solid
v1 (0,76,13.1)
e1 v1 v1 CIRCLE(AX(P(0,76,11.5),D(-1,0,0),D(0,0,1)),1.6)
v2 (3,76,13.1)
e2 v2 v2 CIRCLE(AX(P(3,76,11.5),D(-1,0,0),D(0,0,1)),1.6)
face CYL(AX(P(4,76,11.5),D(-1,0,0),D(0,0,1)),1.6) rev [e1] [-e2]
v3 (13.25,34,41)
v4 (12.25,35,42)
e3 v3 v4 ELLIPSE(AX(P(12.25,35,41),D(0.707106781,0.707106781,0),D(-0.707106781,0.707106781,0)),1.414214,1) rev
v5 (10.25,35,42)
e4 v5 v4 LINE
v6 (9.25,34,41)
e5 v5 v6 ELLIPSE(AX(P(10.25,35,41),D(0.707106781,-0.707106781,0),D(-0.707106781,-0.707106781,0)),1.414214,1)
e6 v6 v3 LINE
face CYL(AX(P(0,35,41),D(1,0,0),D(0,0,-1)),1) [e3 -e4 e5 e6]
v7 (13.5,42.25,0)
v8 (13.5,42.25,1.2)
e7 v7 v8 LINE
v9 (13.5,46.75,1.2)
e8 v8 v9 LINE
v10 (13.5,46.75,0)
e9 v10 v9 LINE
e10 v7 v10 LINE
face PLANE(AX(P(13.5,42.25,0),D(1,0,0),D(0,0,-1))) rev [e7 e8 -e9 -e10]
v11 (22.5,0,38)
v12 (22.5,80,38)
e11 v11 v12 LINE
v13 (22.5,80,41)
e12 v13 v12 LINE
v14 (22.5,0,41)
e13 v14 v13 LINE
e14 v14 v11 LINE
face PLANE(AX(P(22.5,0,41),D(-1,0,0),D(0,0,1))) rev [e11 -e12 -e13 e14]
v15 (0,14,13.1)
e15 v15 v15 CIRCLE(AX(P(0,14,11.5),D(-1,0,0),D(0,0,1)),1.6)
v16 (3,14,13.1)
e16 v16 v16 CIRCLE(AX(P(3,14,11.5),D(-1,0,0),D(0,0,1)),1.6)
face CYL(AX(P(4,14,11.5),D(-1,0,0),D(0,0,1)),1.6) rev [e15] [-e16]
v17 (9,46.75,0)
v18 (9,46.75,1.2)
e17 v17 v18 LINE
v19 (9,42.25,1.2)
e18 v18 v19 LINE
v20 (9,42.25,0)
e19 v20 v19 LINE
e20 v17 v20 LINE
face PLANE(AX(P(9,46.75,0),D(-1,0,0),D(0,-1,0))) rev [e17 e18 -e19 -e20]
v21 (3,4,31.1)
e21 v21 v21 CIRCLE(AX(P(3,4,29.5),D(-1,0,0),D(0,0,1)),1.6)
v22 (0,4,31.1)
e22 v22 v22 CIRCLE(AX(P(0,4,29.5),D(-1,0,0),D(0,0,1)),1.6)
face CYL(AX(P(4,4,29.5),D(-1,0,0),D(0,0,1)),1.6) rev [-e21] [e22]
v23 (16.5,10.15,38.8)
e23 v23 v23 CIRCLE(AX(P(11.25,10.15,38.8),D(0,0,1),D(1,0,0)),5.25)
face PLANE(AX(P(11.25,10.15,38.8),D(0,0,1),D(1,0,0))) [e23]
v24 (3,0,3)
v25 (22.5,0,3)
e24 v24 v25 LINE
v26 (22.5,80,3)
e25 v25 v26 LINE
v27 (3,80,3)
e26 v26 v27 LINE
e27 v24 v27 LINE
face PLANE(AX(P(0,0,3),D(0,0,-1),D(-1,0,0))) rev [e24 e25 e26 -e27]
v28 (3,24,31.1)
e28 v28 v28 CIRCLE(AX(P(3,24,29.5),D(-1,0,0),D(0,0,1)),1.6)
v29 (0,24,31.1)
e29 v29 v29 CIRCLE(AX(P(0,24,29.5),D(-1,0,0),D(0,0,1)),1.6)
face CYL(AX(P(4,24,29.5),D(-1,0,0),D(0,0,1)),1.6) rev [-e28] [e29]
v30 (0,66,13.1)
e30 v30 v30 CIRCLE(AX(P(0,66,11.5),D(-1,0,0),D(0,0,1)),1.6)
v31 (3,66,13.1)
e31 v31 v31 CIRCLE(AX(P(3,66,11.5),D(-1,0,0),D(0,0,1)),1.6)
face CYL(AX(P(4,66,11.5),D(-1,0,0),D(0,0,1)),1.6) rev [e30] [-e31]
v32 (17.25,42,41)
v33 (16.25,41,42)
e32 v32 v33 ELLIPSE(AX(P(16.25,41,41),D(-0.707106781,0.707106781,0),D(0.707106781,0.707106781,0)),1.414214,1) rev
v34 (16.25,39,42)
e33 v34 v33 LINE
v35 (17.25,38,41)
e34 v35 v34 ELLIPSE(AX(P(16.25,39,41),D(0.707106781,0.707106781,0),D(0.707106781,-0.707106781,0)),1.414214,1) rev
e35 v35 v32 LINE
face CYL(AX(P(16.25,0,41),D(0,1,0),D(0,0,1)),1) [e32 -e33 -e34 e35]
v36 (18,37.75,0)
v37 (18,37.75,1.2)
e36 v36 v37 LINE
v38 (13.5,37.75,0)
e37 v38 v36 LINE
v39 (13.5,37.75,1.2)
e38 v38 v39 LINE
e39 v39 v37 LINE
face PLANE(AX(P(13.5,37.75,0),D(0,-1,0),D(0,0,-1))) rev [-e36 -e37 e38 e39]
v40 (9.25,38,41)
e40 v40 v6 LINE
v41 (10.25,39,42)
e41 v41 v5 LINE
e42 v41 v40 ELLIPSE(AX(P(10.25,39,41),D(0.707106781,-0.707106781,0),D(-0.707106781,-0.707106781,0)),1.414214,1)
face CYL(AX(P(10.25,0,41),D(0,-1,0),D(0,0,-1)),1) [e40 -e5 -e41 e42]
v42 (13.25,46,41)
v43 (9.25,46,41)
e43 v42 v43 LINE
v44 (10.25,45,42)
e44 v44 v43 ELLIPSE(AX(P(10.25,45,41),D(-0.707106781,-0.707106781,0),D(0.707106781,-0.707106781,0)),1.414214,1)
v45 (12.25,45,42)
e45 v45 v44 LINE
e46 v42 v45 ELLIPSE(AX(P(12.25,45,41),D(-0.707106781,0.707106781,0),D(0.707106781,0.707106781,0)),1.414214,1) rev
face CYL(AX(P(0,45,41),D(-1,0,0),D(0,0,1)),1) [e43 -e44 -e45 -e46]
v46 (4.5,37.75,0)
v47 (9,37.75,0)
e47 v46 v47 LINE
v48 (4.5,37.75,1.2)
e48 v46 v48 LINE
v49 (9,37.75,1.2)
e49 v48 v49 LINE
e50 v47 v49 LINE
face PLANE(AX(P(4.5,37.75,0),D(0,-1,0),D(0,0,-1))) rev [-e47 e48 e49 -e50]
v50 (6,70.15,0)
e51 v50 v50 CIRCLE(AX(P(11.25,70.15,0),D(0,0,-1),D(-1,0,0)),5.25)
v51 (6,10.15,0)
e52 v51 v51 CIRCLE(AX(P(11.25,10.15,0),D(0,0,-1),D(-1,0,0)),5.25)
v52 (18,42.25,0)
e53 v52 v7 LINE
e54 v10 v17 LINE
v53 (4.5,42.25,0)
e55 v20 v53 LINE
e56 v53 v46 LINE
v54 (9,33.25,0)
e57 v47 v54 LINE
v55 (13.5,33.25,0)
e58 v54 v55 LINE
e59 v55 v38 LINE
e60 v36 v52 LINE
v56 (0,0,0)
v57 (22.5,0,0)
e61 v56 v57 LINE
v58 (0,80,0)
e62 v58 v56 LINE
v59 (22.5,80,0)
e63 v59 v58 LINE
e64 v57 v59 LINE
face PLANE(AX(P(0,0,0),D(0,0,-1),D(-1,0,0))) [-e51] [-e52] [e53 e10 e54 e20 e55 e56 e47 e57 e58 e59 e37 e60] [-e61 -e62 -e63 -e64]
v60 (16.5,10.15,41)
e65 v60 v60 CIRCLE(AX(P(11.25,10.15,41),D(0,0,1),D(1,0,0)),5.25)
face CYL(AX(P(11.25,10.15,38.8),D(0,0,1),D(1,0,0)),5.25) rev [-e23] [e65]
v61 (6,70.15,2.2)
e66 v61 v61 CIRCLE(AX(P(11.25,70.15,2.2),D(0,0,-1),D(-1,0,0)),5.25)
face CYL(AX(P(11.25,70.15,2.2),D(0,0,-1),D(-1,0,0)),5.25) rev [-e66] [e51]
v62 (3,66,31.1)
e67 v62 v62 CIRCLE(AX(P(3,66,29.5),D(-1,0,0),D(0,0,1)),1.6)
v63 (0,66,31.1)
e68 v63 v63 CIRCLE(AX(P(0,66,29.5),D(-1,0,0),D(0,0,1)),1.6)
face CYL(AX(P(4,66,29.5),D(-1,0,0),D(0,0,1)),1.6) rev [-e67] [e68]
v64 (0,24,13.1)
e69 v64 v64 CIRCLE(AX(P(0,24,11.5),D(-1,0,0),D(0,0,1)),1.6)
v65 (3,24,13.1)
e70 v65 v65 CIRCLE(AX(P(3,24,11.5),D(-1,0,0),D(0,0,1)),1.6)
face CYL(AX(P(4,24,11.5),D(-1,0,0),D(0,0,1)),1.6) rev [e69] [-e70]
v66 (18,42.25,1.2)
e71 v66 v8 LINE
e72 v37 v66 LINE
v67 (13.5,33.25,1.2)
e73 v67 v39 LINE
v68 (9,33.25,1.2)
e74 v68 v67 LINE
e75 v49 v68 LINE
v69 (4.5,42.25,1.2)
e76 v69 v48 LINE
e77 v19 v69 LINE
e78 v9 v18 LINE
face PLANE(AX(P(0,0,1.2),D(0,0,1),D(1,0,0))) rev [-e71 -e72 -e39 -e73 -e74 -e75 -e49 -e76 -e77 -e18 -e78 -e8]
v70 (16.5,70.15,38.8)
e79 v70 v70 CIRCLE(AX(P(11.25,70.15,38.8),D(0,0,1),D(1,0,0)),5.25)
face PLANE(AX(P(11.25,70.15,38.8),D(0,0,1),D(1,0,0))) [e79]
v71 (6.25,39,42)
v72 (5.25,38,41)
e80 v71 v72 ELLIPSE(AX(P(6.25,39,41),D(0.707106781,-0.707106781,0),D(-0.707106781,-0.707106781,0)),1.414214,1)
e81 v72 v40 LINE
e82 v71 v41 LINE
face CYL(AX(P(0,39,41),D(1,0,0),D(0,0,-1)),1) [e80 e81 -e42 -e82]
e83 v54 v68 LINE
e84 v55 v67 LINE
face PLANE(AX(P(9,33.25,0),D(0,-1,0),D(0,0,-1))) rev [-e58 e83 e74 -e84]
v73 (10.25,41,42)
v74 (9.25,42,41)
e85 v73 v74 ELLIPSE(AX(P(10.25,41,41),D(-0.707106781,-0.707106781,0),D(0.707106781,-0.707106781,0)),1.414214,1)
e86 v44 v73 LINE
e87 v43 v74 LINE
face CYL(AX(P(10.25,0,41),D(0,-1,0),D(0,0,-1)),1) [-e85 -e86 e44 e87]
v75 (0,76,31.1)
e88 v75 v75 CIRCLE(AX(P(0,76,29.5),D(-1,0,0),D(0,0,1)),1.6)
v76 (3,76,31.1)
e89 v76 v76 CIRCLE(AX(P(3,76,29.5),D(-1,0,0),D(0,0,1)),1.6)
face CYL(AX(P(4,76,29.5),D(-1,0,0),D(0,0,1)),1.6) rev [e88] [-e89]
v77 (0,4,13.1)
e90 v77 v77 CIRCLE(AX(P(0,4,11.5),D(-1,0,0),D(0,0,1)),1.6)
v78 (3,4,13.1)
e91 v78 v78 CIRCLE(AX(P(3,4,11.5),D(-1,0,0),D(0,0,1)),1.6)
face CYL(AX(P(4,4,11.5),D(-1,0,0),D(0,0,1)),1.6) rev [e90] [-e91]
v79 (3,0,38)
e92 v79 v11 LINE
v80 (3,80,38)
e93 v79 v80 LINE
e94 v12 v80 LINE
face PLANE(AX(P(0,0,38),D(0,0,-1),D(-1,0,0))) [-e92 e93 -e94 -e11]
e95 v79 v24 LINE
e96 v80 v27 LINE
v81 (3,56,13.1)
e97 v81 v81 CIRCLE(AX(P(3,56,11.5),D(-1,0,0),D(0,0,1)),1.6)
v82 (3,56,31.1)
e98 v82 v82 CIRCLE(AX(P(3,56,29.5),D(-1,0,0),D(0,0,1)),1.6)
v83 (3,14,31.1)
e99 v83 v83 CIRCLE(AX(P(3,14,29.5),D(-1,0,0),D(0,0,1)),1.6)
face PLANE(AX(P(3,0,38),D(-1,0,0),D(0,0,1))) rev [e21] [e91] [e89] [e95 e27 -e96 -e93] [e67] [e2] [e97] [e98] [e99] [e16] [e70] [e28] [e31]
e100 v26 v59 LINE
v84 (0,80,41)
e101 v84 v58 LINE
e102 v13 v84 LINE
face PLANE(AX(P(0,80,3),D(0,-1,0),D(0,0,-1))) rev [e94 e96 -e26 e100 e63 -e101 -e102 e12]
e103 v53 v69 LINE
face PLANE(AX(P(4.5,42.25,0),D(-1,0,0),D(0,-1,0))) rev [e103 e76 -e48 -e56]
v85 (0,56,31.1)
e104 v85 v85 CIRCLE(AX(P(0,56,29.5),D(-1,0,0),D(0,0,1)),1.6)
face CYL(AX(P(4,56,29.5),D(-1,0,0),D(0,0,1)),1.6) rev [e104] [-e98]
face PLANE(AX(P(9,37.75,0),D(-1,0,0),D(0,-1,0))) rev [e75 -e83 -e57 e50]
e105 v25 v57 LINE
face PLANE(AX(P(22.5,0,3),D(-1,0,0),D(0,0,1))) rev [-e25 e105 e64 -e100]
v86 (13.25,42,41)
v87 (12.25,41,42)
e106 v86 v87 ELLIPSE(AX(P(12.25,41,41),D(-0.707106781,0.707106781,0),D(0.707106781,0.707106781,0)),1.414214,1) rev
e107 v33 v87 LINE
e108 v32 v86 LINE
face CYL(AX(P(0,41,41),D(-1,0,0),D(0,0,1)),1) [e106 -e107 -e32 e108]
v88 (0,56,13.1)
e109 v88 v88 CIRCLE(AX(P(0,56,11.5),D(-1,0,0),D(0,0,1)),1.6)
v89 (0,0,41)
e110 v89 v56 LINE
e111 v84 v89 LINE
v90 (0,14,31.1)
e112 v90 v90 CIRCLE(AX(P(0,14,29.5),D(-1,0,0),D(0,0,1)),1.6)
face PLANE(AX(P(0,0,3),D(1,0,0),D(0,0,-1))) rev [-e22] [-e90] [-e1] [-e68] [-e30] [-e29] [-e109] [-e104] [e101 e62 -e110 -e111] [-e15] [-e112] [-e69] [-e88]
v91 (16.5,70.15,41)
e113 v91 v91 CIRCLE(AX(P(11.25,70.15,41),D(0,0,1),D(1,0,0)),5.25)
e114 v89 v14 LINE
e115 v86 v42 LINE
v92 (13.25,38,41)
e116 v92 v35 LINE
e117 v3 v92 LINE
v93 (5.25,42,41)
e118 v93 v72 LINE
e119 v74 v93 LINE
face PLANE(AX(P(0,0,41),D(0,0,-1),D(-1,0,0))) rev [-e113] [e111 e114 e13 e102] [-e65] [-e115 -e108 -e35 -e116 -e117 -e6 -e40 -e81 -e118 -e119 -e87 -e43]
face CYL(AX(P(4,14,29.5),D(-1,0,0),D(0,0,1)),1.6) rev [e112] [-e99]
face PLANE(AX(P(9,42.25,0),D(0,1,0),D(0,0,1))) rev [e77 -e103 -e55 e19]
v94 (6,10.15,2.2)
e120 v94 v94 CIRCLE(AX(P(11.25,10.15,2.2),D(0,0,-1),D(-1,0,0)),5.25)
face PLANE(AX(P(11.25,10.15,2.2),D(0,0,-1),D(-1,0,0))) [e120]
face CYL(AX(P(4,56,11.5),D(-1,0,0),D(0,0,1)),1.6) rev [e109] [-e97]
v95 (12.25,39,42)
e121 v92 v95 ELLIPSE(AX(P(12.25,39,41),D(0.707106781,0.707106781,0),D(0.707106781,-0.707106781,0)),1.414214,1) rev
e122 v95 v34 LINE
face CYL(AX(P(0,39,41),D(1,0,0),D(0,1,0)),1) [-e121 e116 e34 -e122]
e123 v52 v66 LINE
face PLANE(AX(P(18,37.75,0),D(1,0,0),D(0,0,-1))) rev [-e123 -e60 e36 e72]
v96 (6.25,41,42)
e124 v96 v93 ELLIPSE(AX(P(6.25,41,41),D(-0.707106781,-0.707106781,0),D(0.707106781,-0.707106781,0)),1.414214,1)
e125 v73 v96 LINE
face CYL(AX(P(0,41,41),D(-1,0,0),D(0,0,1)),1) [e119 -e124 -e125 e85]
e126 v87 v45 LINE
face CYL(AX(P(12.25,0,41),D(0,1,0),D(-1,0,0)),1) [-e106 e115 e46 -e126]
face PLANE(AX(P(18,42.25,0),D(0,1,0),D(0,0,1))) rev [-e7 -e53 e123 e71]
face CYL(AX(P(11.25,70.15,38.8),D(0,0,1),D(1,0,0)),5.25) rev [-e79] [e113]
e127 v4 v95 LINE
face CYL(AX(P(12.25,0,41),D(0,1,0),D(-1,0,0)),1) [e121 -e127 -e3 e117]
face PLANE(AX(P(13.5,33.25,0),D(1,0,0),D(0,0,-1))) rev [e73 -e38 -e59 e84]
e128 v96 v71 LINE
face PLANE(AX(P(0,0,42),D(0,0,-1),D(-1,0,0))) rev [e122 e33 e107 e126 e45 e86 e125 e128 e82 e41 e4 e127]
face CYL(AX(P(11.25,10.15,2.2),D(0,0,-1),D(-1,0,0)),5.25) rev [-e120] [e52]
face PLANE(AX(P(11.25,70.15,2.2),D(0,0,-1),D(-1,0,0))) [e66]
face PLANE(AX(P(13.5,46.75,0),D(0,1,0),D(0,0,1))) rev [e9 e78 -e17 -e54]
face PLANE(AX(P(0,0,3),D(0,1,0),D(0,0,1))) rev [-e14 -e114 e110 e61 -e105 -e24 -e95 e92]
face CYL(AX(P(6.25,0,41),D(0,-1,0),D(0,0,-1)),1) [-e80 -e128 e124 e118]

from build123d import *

# Parameters (mm, degrees)
ESQUISSE1_W             = 22.5
ESQUISSE1_H             = 80
BOSS_EXTRU_1_DEPTH      = 3
ESQUISSE2_W             = 3
ESQUISSE2_H             = 80
BOSS_EXTRU_2_DEPTH      = 35
ESQUISSE3_W             = 22.5
ESQUISSE3_H             = 80
BOSS_EXTRU_3_DEPTH      = 3
ESQUISSE4_R             = 5.25
ENL_V_MAT_EXTRU_1_DEPTH = 2.2
ENL_V_START             = -1.8
ENL_V_MAT_EXTRU_2_DEPTH = 1.2
ENL_V_START_2           = -2.2
ESQUISSE6_R             = 5.25
ENL_V_MAT_EXTRU_3_DEPTH = 2.2
BOSS_EXTRU_4_DEPTH      = 1
ESQUISSE8_R             = 1.6
ENL_V_MAT_EXTRU_4_DEPTH = 4
CONG_2_R                = 1


with BuildPart() as part:
    # Esquisse1 → Boss.-Extru.1 (new body)
    with BuildSketch(Plane.XY):
        with Locations((11.25, 40)):
            Rectangle(ESQUISSE1_W, ESQUISSE1_H)
    extrude(amount=BOSS_EXTRU_1_DEPTH)

    # Esquisse2 → Boss.-Extru.2 (add)
    with BuildSketch(Plane.XY.offset(3)):
        with Locations((1.5, 40)):
            Rectangle(ESQUISSE2_W, ESQUISSE2_H)
    extrude(amount=BOSS_EXTRU_2_DEPTH)

    # Esquisse3 → Boss.-Extru.3 (add)
    with BuildSketch(Plane.XY.offset(38)):
        with Locations((11.25, 40)):
            Rectangle(ESQUISSE3_W, ESQUISSE3_H)
    extrude(amount=BOSS_EXTRU_3_DEPTH)

    # Esquisse4 → Enlèv. mat.-Extru.1 (cut)
    with BuildSketch(Plane(origin=(0, 0, 0), x_dir=(-1, 0, 0), z_dir=(0, 0, -1))):
        with Locations((-11.25, 10.15)):
            Circle(ESQUISSE4_R)
        with Locations((-11.25, 70.15)):
            Circle(ESQUISSE4_R)
    extrude(amount=-ENL_V_MAT_EXTRU_1_DEPTH, mode=Mode.SUBTRACT)

    # Esquisse5 → Enlèv. mat.-Extru.2 (cut)
    with BuildSketch(Plane.XY.offset(3).offset(ENL_V_START)):
        Polygon((4.5, 37.75), (9, 37.75), (9, 33.25), (13.5, 33.25), (13.5, 37.75), (18, 37.75), (18, 42.25), (13.5, 42.25), (13.5, 46.75), (9, 46.75), (9, 42.25), (4.5, 42.25), align=None)
    extrude(amount=-ENL_V_MAT_EXTRU_2_DEPTH, mode=Mode.SUBTRACT)

    # Esquisse6 → Enlèv. mat.-Extru.3 (cut)
    with BuildSketch(Plane.XY.offset(41).offset(ENL_V_START_2)):
        with Locations(Location((11.25, 10.15, 0), (0, 0, 180))):
            Circle(ESQUISSE6_R)
        with Locations(Location((11.25, 70.15, 0), (0, 0, 180))):
            Circle(ESQUISSE6_R)
    extrude(amount=ENL_V_MAT_EXTRU_3_DEPTH, mode=Mode.SUBTRACT)

    # Esquisse7 → Boss.-Extru.4 (add)
    with BuildSketch(Plane.XY.offset(41)):
        Polygon((5.25, 42), (9.25, 42), (9.25, 46), (13.25, 46), (13.25, 42), (17.25, 42), (17.25, 38), (13.25, 38), (13.25, 34), (9.25, 34), (9.25, 38), (5.25, 38), align=None)
    extrude(amount=BOSS_EXTRU_4_DEPTH)

    # Esquisse8 → Enlèv. mat.-Extru.4 (cut)
    with BuildSketch(Plane.ZY):
        with Locations((29.5, 76)):
            Circle(ESQUISSE8_R)
        with Locations((29.5, 66)):
            Circle(ESQUISSE8_R)
        with Locations((29.5, 56)):
            Circle(ESQUISSE8_R)
        with Locations((11.5, 76)):
            Circle(ESQUISSE8_R)
        with Locations((11.5, 66)):
            Circle(ESQUISSE8_R)
        with Locations((11.5, 56)):
            Circle(ESQUISSE8_R)
        with Locations((11.5, 4)):
            Circle(ESQUISSE8_R)
        with Locations((11.5, 14)):
            Circle(ESQUISSE8_R)
        with Locations((11.5, 24)):
            Circle(ESQUISSE8_R)
        with Locations((29.5, 24)):
            Circle(ESQUISSE8_R)
        with Locations((29.5, 14)):
            Circle(ESQUISSE8_R)
        with Locations((29.5, 4)):
            Circle(ESQUISSE8_R)
    extrude(amount=-ENL_V_MAT_EXTRU_4_DEPTH, mode=Mode.SUBTRACT)

    # Congé2
    cong_2_edges = [part.edges().sort_by_distance(p)[0] for p in [
        (11.25, 46, 42),
        (9.25, 44, 42),
        (13.25, 44, 42),
        (15.25, 42, 42),
        (17.25, 40, 42),
        (15.25, 38, 42),
        (13.25, 36, 42),
        (9.25, 36, 42),
        (7.25, 38, 42),
        (7.25, 42, 42),
        (5.25, 40, 42),
        (11.25, 34, 42),
    ]]
    fillet(cong_2_edges, radius=CONG_2_R - 0.0001)  # a hair under: the kernel refuses the full size


solid = part.part
